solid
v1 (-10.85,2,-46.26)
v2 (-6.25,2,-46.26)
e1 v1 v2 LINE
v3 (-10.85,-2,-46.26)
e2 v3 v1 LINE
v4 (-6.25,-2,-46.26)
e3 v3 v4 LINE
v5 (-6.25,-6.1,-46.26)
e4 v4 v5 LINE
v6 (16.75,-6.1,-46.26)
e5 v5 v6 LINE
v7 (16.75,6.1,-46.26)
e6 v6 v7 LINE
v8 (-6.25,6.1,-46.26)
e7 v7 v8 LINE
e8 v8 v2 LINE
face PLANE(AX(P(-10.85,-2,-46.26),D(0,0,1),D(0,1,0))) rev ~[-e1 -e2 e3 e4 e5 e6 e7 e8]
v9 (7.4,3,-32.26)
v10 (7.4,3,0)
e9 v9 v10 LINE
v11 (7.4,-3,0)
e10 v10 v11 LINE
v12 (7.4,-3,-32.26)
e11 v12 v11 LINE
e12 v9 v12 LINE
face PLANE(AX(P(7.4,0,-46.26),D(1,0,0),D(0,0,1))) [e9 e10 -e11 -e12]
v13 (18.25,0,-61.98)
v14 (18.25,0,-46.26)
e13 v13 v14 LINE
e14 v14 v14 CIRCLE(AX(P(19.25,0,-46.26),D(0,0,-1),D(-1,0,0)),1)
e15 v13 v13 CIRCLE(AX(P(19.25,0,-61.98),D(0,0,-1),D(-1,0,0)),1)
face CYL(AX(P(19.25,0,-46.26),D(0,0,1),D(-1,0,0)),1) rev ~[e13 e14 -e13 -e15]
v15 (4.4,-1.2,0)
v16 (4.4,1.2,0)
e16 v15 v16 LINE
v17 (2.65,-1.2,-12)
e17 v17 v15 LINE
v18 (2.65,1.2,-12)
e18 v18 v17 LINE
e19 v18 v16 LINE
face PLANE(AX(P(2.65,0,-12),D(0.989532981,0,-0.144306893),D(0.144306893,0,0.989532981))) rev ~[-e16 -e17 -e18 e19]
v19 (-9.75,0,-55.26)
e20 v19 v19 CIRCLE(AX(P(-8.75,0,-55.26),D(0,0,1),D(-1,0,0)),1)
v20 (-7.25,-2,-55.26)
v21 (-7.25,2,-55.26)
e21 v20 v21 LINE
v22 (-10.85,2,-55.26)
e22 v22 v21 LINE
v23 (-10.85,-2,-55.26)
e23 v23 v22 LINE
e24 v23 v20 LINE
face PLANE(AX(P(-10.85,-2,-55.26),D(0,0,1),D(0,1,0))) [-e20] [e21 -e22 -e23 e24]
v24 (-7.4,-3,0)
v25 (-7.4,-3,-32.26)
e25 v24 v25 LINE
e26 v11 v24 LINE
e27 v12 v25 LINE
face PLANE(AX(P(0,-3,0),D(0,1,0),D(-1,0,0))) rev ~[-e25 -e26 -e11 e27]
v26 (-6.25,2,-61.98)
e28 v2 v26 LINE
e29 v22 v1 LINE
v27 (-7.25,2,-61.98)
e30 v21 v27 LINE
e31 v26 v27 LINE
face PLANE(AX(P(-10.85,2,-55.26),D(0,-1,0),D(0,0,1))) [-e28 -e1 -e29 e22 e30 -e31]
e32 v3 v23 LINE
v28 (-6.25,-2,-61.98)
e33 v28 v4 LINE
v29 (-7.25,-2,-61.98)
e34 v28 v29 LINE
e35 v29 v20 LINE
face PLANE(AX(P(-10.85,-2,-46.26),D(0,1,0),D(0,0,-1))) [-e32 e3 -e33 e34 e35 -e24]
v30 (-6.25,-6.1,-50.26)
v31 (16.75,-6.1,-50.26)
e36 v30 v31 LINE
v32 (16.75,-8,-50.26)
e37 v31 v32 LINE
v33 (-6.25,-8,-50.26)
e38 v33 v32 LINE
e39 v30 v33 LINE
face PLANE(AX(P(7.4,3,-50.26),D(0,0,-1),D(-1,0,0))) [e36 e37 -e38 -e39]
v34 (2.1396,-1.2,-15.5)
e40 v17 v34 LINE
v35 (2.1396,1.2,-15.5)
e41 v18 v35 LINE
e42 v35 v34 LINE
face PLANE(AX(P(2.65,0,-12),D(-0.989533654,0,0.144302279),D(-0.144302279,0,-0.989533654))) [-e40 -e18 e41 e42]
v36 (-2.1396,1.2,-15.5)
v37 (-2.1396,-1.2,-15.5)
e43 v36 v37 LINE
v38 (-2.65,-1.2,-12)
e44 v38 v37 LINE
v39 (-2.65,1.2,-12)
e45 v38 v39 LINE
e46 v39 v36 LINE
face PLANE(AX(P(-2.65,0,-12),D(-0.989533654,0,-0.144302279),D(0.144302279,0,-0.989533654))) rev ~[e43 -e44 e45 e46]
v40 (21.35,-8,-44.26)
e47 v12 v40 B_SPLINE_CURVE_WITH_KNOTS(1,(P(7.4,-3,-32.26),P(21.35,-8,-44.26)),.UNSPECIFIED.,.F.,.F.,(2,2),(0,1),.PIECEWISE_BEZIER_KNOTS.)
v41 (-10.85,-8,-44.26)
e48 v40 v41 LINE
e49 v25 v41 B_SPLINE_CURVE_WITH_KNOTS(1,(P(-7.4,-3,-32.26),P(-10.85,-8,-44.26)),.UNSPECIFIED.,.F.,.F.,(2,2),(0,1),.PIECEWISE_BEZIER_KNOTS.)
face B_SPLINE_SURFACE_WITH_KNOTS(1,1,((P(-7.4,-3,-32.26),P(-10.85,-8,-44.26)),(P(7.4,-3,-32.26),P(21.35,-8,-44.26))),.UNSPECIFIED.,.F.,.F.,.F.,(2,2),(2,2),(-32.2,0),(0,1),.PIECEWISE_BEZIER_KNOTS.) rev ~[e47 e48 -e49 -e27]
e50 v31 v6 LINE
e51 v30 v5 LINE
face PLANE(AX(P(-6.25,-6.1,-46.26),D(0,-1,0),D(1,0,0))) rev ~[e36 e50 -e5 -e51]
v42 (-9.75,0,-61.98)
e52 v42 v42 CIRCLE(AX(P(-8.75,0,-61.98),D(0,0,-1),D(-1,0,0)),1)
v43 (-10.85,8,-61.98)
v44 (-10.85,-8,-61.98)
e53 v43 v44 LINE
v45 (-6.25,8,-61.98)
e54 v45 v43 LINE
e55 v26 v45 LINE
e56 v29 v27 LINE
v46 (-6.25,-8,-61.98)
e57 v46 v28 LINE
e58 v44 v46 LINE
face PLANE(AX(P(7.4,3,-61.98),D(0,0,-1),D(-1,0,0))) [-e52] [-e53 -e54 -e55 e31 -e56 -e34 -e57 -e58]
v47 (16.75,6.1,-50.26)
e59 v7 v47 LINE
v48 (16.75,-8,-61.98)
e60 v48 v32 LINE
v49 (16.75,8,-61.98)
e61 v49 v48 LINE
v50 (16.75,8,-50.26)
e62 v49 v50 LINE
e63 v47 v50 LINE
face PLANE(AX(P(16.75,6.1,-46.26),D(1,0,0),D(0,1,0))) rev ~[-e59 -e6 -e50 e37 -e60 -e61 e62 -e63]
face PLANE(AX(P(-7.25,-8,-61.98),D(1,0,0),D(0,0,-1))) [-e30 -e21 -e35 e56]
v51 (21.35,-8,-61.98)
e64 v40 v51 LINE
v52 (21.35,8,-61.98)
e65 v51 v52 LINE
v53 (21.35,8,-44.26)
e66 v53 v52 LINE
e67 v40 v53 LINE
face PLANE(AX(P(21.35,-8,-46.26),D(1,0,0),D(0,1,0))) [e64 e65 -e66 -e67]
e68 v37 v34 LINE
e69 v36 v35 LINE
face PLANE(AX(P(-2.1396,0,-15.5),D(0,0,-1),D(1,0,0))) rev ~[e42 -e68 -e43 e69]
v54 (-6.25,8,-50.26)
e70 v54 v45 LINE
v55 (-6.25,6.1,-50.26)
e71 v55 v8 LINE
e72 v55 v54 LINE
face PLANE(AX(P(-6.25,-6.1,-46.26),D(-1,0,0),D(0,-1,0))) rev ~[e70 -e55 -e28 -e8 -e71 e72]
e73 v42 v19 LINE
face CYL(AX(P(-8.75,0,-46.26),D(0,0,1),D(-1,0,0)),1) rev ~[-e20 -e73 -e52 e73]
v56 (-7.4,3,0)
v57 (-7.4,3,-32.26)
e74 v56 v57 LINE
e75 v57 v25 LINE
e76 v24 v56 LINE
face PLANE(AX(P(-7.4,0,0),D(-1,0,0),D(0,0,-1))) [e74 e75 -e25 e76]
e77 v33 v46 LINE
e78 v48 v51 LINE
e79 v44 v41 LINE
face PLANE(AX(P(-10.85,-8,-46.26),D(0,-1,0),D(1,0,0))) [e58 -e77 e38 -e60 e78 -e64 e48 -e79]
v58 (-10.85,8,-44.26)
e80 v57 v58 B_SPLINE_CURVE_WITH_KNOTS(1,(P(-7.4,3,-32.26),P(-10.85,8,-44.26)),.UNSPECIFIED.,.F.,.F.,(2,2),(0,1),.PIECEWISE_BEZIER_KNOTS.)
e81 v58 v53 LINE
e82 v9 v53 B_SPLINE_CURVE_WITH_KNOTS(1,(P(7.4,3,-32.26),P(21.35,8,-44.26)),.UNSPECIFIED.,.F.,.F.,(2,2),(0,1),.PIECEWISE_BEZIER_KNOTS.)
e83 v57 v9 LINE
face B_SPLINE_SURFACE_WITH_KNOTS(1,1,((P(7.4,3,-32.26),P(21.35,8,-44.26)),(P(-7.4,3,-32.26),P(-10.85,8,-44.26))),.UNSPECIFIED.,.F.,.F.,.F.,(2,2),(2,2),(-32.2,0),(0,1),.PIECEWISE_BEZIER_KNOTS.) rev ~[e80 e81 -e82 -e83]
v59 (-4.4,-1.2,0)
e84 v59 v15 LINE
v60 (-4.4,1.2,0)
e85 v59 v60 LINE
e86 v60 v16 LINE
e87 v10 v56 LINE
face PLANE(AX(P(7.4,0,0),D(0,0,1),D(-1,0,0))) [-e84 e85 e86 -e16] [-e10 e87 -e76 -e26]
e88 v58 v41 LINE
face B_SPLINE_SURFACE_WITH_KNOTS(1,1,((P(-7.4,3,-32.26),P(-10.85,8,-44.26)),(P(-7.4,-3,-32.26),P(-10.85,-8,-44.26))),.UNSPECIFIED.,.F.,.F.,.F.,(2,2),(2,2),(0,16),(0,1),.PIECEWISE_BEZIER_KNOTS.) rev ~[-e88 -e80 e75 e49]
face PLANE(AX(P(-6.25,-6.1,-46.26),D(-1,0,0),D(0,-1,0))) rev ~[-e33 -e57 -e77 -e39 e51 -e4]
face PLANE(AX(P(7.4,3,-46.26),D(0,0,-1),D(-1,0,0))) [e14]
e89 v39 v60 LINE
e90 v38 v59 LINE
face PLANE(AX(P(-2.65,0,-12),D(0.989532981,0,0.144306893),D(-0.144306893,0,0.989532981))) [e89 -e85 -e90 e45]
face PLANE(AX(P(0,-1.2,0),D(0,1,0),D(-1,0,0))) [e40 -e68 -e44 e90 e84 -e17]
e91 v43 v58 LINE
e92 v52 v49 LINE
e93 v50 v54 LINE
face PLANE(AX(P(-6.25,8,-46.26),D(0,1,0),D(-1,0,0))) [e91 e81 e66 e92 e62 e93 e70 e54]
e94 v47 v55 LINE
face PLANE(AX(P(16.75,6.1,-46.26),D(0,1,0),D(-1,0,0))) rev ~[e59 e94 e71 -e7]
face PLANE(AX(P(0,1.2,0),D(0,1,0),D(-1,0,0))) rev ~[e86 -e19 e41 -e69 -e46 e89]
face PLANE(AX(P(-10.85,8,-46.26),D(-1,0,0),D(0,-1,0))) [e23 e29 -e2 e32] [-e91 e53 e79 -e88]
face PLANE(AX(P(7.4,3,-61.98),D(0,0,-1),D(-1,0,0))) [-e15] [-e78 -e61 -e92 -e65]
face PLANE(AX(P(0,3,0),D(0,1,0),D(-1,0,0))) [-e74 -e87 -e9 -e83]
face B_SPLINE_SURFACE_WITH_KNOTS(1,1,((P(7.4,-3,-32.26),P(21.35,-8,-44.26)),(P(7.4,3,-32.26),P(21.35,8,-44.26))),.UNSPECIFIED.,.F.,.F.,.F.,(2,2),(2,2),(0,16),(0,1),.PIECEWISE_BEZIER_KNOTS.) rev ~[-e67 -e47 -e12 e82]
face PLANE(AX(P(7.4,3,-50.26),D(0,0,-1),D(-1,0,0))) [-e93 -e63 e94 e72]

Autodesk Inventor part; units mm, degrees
ref_plane "YZ Plane" through (0, 0, 0) normal (1, 0, 0) x (0, 1, 0)
ref_plane "XZ Plane" through (0, 0, 0) normal (0, 1, 0) x (-1, 0, 0)
ref_plane "XY Plane" through (0, 0, 0) normal (0, 0, 1) x (1, 0, 0)
sketch "Sketch1" plane through (0, 0, 0) normal (0, 1, 0) x (-1, 0, 0)
  line L0 (-4.4, 0) -> (4.4, 0) construction
  line L1 (0, 0) -> (0, -12) construction
  line L2 (2.65, -12) -> (-2.65, -12) construction
  line L3 (2.65, -12) -> (4.4, 0)
  line L4 (-2.65, -12) -> (-4.4, 0)
  line L5 (0, -12) -> (0, -15.5) construction
  line L6 (0, -15.5) -> (-4, -15.5) construction
  line L7 (0, -15.5) -> (4, -15.5) construction
  line L8 (0, -15.5) -> (4, -15.5) construction
  line L9 (2.65, -12) -> (2.1396, -15.5)
  line L10 (-2.65, -12) -> (-2.1396, -15.5)
  line L11 (2.1396, -15.5) -> (-2.1396, -15.5)
  line L12 (-7.4, 0) -> (12.6, 0) construction
  line L13 (4.4, 0) -> (-4.4, 0)
  dimension "d0" = 8.8
  dimension "d1" = 12
  dimension "d2" = 5.3
  dimension "d3" = 3.5
  dimension "d4" = 4
  dimension "d5" = 4
  dimension "d7" = 3
sketch "Sketch2" plane through (0, 0, 0) normal (0, 1, 0) x (-1, 0, 0)
  line L0 (7.4, -46.26) -> (-7.4, -46.26)
  line L1 (-7.4, -46.26) -> (-7.4, 0)
  line L2 (-7.4, 0) -> (7.4, 0)
  line L3 (7.4, 0) -> (7.4, -46.26)
  line L4 (0, 0) -> (0, 4) construction
  line L5 (0, 0) -> (0, -46.26) construction
  dimension "d18" = 4
  dimension "d19" = 50.26
  dimension "d20" = 14.8
extrude "Extrusion1" add sketch "Sketch2" along normal mid plane 6
extrude "Extrusion2" cut sketch "Sketch1" along normal mid plane 2.4
sketch "Sketch3" plane through (0, 0, 0) normal (0, 1, 0) x (-1, 0, 0)
  line L0 (0, 0) -> (0, 4) construction
  line L1 (0, 0) -> (0, -46.26) construction
  dimension "d15" = 4
  dimension "d17" = 50.26
sketch "Sketch4" plane through (7.4, 3, -46.26) normal (0, 0, -1) x (-1, 0, 0)
  line L0 (-13.95, 5) -> (18.25, 5)
  line L1 (18.25, 5) -> (18.25, -11)
  line L2 (18.25, -11) -> (-13.95, -11)
  line L3 (-13.95, -11) -> (-13.95, 5)
  line L4 (-9.35, 3.1) -> (13.65, 3.1)
  line L5 (13.65, 3.1) -> (13.65, -9.1)
  line L6 (13.65, -9.1) -> (-9.35, -9.1)
  line L7 (-9.35, -9.1) -> (-9.35, 3.1)
  line L8 (2.15, 5) -> (2.15, -11) construction
  line L9 (18.25, -3) -> (-13.95, -3) construction
  line L10 (-9.35, 3.1) -> (-9.35, 5)
  line L11 (13.65, 3.1) -> (13.65, 5)
  line L12 (13.65, -9.1) -> (13.65, -11)
  line L13 (-9.35, -9.1) -> (-9.35, -11)
  circle A0 centre (16.15, -3) radius 1
  circle A1 centre (-11.85, -3) radius 1
  point P0 (7.4, -3)
  point P1 (2.15, -3)
  dimension "d21" = 32.2
  dimension "d22" = 16
  dimension "d23" = 23
  dimension "d24" = 12.2
  dimension "d25" = 2.5
  dimension "d26" = 2
  dimension "d27" = 2.5
  dimension "d28" = 2
  dimension "d43" = 5.25
extrude "Extrusion3" add sketch "Sketch4" along normal blind 15.72 and the other way blind 2 contours L0 L10 L7 L13 L2 L3 | L0 L1 L2 L12 L5 L11
extrude "Extrusion4" add sketch "Sketch4" along normal blind 4 and the other way blind 2 contours L0 L11 L4 L10 | L13 L6 L12 L2
extrude "Extrusion5" add sketch "Sketch4" against normal blind 2 contours A0 | A1
extrude "Extrusion6" add sketch "Sketch4" against normal blind 2 contours L4 L5 L6 L7
sketch "Sketch5" plane through (-10.85, -8, -61.98) normal (-1, 0, 0) x (0, 0, 1)
  line L0 (15.72, 1.9) -> (15.72, 14.1) projected
  line L1 (15.72, 8) -> (6.72, 8) construction
  line L2 (15.72, 6) -> (6.72, 6)
  line L3 (6.72, 6) -> (6.72, 10)
  line L4 (6.72, 10) -> (15.72, 10)
  line L5 (15.72, 10) -> (15.72, 6)
  line L6 (15.72, 6) -> (6.72, 10) construction
  line L7 (6.72, 6) -> (15.72, 10) construction
  point P0 (61.98, 8)
  point P1 (11.22, 8)
  dimension "d44" = 9
  dimension "d45" = 4
extrude "Extrusion7" cut sketch "Sketch5" against normal blind 6
sketch "Sketch6" plane through (-6.25, -8, -61.98) normal (1, 0, 0) x (0, 0, -1)
  line L0 (-15.72, 10) -> (-6.72, 10) projected
  line L1 (0, 0) -> (0, 16) projected
  line L2 (-6.72, 10) -> (0, 10)
  line L3 (0, 10) -> (0, 6)
  line L4 (0, 6) -> (-6.72, 6)
  line L5 (-6.72, 6) -> (-6.72, 10)
  point P0 (-61.98, 8)
  dimension "d48" = 4
extrude "Extrusion8" cut sketch "Sketch6" against normal blind 1
ref_plane "Work Plane1" through (7.4, 3, -32.26) normal (0, 0, 1) x (1, 0, 0)
sketch "Sketch7" plane through (7.4, 3, -32.26) normal (0, 0, 1) x (1, 0, 0)
  line L0 (-14.8, 0) -> (0, 0) projected
  line L1 (0, 0) -> (0, -6) projected
  line L2 (0, -6) -> (-14.8, -6) projected
  line L3 (-14.8, 0) -> (-14.8, -6) projected
  point P0 (-7.4, -3)
sketch "Sketch8" plane through (7.4, 3, -44.26) normal (0, 0, 1) x (1, 0, 0)
  line L0 (13.95, 5) -> (-18.25, 5) projected
  line L1 (-18.25, 5) -> (-18.25, -11) projected
  line L2 (-18.25, -11) -> (13.95, -11) projected
  line L3 (13.95, -11) -> (13.95, 5) projected
  point P0 (-7.4, -3)
loft "Loft1" add profiles "Sketch7" section 2 edges at (5.25, 8, -44.26) (-10.85, 0, -44.26) (5.25, -8, -44.26) (21.35, 0, -44.26)
properties part number "tilt_pillar"
